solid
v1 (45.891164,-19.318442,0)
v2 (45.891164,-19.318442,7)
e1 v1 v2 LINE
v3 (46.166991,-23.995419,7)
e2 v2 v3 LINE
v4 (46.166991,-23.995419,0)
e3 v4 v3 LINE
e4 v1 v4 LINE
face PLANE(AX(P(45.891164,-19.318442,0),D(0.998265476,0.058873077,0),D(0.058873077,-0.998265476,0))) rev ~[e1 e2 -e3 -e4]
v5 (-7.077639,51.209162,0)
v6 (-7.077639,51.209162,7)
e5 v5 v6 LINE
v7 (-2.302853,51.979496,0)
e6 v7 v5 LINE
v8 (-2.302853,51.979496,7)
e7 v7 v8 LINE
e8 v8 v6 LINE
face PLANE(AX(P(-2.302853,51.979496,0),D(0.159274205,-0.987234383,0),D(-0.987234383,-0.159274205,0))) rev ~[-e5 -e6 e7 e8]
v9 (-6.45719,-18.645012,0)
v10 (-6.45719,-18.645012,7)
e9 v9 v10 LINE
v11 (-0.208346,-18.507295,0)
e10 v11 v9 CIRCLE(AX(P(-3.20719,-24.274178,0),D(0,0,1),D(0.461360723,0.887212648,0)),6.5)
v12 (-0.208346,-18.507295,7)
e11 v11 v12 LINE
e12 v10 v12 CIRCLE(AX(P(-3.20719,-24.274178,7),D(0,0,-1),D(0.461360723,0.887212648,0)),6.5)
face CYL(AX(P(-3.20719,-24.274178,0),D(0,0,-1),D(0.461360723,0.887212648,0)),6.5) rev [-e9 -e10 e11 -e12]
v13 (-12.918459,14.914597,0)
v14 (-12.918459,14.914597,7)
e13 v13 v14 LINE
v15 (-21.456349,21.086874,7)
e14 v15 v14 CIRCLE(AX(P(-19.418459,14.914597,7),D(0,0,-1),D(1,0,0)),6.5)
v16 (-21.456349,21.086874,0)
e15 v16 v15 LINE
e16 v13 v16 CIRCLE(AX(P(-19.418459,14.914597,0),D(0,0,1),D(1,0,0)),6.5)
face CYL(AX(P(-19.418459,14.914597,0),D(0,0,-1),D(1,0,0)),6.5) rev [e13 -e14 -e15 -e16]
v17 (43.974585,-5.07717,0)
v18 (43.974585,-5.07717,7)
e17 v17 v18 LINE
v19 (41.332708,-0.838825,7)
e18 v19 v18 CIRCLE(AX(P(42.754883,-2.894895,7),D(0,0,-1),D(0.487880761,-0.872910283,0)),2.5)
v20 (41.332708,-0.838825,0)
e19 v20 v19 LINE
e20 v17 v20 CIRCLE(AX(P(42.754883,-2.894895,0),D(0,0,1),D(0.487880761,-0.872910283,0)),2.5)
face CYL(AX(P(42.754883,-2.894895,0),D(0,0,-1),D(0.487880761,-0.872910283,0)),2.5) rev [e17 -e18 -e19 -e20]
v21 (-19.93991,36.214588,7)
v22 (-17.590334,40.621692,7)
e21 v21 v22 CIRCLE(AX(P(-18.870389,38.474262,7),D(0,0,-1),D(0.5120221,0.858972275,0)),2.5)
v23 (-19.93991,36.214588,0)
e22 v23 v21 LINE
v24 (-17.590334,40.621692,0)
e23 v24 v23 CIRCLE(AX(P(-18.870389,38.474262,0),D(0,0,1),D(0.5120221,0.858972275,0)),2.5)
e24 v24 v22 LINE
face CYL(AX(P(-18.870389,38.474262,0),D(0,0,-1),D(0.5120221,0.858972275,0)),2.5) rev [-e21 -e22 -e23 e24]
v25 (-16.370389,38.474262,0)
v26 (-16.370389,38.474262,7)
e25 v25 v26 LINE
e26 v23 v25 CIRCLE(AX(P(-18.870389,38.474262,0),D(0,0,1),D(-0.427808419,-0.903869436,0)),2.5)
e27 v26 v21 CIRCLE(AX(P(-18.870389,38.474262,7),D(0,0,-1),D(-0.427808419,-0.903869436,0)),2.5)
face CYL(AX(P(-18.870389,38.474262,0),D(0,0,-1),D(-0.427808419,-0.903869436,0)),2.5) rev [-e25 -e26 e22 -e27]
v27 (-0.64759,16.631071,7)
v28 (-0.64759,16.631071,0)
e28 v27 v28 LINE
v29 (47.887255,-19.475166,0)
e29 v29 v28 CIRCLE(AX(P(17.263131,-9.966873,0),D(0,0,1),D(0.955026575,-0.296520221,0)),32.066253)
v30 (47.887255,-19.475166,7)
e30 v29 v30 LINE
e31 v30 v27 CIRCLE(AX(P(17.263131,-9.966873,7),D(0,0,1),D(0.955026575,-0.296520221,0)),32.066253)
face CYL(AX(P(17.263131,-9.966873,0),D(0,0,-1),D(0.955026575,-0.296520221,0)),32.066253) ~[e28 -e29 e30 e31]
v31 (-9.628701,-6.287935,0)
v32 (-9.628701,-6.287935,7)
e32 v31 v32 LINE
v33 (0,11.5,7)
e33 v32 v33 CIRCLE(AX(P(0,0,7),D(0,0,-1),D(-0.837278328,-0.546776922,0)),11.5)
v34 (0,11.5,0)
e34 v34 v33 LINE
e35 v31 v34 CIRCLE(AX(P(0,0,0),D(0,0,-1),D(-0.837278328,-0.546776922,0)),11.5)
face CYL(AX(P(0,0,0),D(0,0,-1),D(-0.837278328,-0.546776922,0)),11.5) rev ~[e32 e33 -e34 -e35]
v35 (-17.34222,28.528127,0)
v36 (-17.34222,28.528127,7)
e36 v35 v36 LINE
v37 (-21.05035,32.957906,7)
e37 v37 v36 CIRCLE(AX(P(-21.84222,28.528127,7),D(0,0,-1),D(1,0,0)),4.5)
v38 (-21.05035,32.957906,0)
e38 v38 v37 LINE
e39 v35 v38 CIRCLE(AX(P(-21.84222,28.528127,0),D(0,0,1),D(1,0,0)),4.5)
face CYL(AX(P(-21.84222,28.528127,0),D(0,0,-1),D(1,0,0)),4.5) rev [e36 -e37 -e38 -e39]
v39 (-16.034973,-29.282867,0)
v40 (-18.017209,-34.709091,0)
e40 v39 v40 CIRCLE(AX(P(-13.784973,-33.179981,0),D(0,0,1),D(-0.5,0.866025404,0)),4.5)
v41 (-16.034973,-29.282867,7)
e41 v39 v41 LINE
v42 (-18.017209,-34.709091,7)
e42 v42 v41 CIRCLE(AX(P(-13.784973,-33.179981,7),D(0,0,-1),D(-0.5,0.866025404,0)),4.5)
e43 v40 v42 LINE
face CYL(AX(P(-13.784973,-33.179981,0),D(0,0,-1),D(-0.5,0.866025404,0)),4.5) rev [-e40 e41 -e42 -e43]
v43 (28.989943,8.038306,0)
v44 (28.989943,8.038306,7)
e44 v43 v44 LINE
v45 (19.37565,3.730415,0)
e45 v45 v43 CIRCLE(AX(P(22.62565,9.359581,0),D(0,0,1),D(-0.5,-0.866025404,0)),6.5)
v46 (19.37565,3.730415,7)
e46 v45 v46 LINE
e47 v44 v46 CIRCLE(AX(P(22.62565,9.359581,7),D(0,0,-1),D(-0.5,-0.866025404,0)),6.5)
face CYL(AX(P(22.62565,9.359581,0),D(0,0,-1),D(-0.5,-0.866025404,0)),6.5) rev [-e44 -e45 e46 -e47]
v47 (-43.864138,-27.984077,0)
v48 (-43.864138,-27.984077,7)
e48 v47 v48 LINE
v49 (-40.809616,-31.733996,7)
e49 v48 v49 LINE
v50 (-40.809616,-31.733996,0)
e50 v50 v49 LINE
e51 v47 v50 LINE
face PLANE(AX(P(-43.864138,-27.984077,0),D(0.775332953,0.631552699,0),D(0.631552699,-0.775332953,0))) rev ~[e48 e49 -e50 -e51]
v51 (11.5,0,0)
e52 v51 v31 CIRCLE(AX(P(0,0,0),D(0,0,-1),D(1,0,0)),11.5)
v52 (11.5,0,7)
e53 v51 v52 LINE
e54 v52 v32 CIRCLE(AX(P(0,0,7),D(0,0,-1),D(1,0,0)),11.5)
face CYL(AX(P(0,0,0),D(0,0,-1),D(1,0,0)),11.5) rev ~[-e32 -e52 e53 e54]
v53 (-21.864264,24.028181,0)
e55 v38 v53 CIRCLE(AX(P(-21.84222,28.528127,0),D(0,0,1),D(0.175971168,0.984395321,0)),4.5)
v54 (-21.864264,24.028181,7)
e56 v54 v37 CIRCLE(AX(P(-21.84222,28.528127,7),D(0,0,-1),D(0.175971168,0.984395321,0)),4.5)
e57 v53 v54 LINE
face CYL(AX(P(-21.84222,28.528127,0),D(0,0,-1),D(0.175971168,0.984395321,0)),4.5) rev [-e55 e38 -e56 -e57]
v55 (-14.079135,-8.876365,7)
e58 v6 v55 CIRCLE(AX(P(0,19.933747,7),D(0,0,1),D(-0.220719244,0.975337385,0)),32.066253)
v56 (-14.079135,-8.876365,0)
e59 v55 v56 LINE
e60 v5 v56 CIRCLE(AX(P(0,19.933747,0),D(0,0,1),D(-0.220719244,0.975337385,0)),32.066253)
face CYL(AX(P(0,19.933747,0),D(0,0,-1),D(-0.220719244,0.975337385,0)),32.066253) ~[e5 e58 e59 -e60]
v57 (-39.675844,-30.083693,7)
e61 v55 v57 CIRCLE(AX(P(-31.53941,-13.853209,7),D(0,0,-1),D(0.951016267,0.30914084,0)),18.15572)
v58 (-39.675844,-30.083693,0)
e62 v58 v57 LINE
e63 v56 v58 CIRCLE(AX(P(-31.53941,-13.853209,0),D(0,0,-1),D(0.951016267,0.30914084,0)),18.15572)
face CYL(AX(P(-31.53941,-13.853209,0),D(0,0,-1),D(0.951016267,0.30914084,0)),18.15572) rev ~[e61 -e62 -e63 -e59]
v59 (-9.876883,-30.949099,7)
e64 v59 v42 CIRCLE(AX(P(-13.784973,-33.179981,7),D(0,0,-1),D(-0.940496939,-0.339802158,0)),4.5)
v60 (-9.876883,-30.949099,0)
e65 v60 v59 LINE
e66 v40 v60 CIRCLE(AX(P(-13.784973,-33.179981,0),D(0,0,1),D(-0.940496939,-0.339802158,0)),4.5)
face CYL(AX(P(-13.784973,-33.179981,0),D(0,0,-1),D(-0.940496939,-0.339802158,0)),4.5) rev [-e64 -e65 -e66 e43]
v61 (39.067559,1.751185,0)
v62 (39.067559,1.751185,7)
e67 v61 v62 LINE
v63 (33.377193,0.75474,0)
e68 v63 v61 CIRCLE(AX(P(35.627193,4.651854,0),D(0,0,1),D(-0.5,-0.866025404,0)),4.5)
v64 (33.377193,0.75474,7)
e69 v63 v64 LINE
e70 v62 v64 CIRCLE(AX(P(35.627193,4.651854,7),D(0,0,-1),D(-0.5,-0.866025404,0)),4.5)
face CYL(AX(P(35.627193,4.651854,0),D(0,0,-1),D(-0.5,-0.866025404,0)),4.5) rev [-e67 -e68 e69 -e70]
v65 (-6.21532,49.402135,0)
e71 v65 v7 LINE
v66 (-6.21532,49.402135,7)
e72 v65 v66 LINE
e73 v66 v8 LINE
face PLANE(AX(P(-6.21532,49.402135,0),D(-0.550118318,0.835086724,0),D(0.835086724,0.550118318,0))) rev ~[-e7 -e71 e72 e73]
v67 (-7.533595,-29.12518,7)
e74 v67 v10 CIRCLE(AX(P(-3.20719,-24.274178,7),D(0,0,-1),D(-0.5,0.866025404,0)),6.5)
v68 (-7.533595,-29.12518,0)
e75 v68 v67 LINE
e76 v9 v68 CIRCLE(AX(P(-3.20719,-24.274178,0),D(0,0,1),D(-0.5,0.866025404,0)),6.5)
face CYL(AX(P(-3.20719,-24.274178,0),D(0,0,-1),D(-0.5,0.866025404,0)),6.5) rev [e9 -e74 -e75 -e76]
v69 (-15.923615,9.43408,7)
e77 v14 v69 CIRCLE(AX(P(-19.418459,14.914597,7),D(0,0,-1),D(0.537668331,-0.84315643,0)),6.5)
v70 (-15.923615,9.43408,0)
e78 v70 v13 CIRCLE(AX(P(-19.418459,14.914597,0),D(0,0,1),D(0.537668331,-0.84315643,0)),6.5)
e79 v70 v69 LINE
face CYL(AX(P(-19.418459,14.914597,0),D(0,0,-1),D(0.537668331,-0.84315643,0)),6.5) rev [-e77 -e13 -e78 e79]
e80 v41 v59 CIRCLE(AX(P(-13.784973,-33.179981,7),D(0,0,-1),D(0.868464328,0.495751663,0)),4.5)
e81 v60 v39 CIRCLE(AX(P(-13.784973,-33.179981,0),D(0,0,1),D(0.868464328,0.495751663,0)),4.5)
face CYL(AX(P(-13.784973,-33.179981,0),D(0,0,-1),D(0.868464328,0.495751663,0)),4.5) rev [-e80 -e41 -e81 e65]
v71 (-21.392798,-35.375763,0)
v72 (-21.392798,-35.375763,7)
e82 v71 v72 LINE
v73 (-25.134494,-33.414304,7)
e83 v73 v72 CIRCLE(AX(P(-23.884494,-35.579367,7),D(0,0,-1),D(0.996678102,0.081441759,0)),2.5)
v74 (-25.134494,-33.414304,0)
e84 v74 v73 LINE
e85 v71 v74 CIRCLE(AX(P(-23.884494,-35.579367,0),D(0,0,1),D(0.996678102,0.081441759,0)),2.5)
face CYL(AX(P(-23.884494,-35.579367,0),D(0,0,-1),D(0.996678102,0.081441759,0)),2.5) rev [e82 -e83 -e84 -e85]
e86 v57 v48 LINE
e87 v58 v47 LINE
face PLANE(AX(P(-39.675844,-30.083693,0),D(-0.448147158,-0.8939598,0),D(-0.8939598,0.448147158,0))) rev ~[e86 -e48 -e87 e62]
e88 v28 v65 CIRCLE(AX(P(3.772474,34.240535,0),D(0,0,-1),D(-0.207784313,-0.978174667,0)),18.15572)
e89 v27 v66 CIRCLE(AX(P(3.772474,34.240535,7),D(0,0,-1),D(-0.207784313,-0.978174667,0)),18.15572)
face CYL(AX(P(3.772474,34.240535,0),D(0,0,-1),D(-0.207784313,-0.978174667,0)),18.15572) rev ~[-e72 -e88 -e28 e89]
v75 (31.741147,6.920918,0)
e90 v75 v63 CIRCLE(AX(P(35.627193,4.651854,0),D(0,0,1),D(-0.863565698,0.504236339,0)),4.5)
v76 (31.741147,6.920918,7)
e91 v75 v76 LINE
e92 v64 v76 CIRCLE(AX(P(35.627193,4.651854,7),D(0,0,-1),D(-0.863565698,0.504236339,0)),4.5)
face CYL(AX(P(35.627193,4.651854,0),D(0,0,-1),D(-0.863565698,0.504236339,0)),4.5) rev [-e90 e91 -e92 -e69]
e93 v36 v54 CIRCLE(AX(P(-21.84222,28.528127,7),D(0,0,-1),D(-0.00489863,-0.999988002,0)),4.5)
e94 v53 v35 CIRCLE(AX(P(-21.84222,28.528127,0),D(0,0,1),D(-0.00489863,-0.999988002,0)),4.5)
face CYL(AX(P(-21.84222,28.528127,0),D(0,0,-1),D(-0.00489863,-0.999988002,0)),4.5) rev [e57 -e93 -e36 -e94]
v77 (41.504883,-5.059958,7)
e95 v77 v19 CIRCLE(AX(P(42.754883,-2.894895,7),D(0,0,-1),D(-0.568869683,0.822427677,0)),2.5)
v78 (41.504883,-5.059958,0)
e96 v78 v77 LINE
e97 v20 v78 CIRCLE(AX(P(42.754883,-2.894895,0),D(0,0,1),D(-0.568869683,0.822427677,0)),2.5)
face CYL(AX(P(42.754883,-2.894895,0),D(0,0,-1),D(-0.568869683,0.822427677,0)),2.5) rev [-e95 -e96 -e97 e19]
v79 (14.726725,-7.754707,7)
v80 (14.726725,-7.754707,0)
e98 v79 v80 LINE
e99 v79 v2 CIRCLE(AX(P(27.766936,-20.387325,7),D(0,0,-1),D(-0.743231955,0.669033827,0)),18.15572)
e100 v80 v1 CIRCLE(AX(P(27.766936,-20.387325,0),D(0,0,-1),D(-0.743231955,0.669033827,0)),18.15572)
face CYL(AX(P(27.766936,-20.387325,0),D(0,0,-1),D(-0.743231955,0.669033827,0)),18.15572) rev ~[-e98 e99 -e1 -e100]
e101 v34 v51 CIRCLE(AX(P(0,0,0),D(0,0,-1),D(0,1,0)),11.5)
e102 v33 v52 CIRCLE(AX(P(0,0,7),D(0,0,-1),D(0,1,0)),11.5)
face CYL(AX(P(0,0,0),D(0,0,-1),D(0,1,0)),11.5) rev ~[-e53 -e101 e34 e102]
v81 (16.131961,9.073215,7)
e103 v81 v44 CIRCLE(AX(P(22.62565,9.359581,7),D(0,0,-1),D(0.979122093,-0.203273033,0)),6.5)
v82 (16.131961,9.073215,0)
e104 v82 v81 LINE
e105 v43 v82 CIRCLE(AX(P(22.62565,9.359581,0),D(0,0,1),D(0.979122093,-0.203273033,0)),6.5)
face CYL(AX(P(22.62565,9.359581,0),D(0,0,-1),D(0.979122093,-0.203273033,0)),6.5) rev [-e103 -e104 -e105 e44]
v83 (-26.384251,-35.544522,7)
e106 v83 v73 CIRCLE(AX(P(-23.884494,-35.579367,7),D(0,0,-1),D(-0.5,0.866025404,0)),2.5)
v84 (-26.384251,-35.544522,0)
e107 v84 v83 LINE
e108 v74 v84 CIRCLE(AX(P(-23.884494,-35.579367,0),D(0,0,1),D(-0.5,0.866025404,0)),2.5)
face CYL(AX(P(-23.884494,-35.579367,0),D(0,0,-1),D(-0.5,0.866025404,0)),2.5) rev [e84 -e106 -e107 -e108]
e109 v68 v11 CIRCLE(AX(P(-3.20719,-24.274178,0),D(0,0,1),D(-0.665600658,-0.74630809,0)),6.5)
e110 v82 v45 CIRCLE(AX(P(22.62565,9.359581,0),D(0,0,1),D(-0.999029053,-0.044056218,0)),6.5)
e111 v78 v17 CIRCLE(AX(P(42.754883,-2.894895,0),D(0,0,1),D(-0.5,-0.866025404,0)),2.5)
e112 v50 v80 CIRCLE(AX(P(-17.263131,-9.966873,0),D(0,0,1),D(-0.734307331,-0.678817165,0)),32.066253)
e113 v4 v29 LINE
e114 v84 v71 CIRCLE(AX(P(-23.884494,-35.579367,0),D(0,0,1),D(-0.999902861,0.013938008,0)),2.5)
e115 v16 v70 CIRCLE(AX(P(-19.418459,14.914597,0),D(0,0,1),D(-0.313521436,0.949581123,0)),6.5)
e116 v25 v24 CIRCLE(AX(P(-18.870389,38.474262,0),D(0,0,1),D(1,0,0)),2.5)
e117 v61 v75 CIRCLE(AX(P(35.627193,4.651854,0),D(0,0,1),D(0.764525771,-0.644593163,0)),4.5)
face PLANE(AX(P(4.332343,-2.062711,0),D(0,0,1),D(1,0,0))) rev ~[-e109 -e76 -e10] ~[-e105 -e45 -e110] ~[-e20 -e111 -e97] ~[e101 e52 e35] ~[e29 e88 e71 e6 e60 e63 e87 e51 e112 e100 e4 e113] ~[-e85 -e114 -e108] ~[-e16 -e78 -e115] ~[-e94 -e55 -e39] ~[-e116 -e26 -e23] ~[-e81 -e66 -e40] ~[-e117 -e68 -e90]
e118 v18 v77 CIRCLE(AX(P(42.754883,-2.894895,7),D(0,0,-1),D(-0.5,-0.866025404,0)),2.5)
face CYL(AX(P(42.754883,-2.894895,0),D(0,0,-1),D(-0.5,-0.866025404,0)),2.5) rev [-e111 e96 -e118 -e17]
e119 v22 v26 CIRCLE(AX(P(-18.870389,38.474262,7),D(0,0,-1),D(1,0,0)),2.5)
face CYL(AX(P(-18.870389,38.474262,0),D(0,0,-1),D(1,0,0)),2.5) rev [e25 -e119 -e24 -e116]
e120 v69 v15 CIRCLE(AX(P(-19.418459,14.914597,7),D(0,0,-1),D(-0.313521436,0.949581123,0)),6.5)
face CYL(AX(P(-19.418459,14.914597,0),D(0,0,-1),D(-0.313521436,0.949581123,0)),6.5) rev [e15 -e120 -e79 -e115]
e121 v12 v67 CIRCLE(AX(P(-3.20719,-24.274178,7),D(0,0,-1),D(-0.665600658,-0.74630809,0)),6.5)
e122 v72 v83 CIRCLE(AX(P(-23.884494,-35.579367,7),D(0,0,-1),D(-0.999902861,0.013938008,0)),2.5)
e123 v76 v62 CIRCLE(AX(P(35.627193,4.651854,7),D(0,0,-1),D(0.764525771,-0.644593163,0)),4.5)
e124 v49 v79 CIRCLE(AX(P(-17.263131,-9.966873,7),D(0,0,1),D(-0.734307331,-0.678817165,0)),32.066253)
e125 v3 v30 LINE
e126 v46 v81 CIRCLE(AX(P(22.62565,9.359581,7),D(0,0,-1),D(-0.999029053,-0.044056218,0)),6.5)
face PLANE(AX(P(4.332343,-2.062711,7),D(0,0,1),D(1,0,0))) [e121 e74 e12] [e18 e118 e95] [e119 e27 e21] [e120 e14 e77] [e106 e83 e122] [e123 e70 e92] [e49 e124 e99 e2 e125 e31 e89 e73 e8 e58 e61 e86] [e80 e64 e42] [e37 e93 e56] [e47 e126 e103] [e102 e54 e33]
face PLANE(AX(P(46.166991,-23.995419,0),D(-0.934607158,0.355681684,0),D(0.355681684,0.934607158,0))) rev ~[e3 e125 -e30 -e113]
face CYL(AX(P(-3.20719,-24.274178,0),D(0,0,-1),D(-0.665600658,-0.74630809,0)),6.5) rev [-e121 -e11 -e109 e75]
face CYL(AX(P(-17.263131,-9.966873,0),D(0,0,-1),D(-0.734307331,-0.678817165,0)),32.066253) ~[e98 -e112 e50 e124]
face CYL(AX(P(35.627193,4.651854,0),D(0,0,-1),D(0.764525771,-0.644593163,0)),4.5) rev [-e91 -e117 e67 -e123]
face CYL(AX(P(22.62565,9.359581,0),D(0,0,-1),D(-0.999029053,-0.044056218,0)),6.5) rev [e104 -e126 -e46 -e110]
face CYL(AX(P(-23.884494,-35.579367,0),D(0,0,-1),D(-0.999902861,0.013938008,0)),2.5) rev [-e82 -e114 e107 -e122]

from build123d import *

# Parameters (mm, degrees)
F1_DEPTH = 7
F4_DEPTH = 25
F5_DEPTH = 25
F6_DEPTH = 25
F7_COUNT = 3
F8_DEPTH = 7


# Not quite as in the source:
# - a feature names something its author has since deleted; it is built from what else it names


with BuildPart() as f1:
    # F0 (on Top) → F1 (new body)
    with BuildSketch(Plane.XY):
        with BuildLine():
            ThreePointArc((-13.7992422924, -9.0114684358), (-14.4938657477, 7.8456043045), (0, 16.4810694803))
            ThreePointArc((0, 16.4810694803), (-14.068080809, 30.8723339162), (-6.2153203117, 49.4021353799))
            Line((-6.2153203117, 49.4021353799), (-2.3028528943, 51.9794964298))
            Line((-2.3028528943, 51.9794964298), (-7.0776391154, 51.2091623618))
            ThreePointArc((-7.0776391154, 51.2091623618), (-31.8683563703, 23.4907745685), (-13.7992422924, -9.0114684358))
        make_face()
    extrude(amount=F1_DEPTH)

    # F2 (on Top) → F4 (cut)
    with BuildSketch(Plane.XY):
        with BuildLine():
            ThreePointArc((-19.9399101365, 36.2145881717), (-17.5331910144, 36.3619404524), (-16.370389089, 38.4742617607))
            ThreePointArc((-16.370389089, 38.4742617607), (-16.6966666914, 39.7091427016), (-17.5903338395, 40.6216924484))
            ThreePointArc((-17.5903338395, 40.6216924484), (-18.870389089, 38.4742617607), (-19.9399101365, 36.2145881717))
        make_face()
        with BuildLine():
            ThreePointArc((-12.9184592818, 14.9145969957), (-15.6103285505, 20.1822473574), (-21.4563486152, 21.0868742954))
            ThreePointArc((-21.4563486152, 21.0868742954), (-19.4184592818, 14.9145969957), (-15.9236151324, 9.4340801978))
            ThreePointArc((-15.9236151324, 9.4340801978), (-13.7190519893, 11.7894159586), (-12.9184592818, 14.9145969957))
        make_face()
        with BuildLine():
            ThreePointArc((-15.9236151324, 9.4340801978), (-19.4184592818, 14.9145969957), (-21.4563486152, 21.0868742954))
            ThreePointArc((-21.4563486152, 21.0868742954), (-25.2902206788, 12.1266913129), (-15.9236151324, 9.4340801978))
        make_face()
        with BuildLine():
            ThreePointArc((-17.3422204011, 28.5281271909), (-18.3916105886, 31.4166028999), (-21.0503501441, 32.9579061352))
            ThreePointArc((-21.0503501441, 32.9579061352), (-21.8422204011, 28.5281271909), (-21.8642642373, 24.0281811835))
            ThreePointArc((-21.8642642373, 24.0281811835), (-18.6680431268, 25.3383625238), (-17.3422204011, 28.5281271909))
        make_face()
        with BuildLine():
            ThreePointArc((-21.8642642373, 24.0281811835), (-21.8422204011, 28.5281271909), (-21.0503501441, 32.9579061352))
            ThreePointArc((-21.0503501441, 32.9579061352), (-26.3236437362, 28.9365937035), (-21.8642642373, 24.0281811835))
        make_face()
        with BuildLine():
            ThreePointArc((-19.9399101365, 36.2145881717), (-18.870389089, 38.4742617607), (-17.5903338395, 40.6216924484))
            ThreePointArc((-17.5903338395, 40.6216924484), (-21.0764541807, 39.6503896496), (-19.9399101365, 36.2145881717))
        make_face()
    extrude(amount=-F4_DEPTH, mode=Mode.SUBTRACT)

    # F2 (on Top) → F5 (cut)
    with BuildSketch(Plane.XY):
        with BuildLine():
            ThreePointArc((-19.9399101365, 36.2145881717), (-17.5331910144, 36.3619404524), (-16.370389089, 38.4742617607))
            ThreePointArc((-16.370389089, 38.4742617607), (-16.6966666914, 39.7091427016), (-17.5903338395, 40.6216924484))
            ThreePointArc((-17.5903338395, 40.6216924484), (-18.870389089, 38.4742617607), (-19.9399101365, 36.2145881717))
        make_face()
        with BuildLine():
            ThreePointArc((-12.9184592818, 14.9145969957), (-15.6103285505, 20.1822473574), (-21.4563486152, 21.0868742954))
            ThreePointArc((-21.4563486152, 21.0868742954), (-19.4184592818, 14.9145969957), (-15.9236151324, 9.4340801978))
            ThreePointArc((-15.9236151324, 9.4340801978), (-13.7190519893, 11.7894159586), (-12.9184592818, 14.9145969957))
        make_face()
        with BuildLine():
            ThreePointArc((-15.9236151324, 9.4340801978), (-19.4184592818, 14.9145969957), (-21.4563486152, 21.0868742954))
            ThreePointArc((-21.4563486152, 21.0868742954), (-25.2902206788, 12.1266913129), (-15.9236151324, 9.4340801978))
        make_face()
        with BuildLine():
            ThreePointArc((-17.3422204011, 28.5281271909), (-18.3916105886, 31.4166028999), (-21.0503501441, 32.9579061352))
            ThreePointArc((-21.0503501441, 32.9579061352), (-21.8422204011, 28.5281271909), (-21.8642642373, 24.0281811835))
            ThreePointArc((-21.8642642373, 24.0281811835), (-18.6680431268, 25.3383625238), (-17.3422204011, 28.5281271909))
        make_face()
        with BuildLine():
            ThreePointArc((-21.8642642373, 24.0281811835), (-21.8422204011, 28.5281271909), (-21.0503501441, 32.9579061352))
            ThreePointArc((-21.0503501441, 32.9579061352), (-26.3236437362, 28.9365937035), (-21.8642642373, 24.0281811835))
        make_face()
        with BuildLine():
            ThreePointArc((-19.9399101365, 36.2145881717), (-18.870389089, 38.4742617607), (-17.5903338395, 40.6216924484))
            ThreePointArc((-17.5903338395, 40.6216924484), (-21.0764541807, 39.6503896496), (-19.9399101365, 36.2145881717))
        make_face()
    extrude(amount=-F5_DEPTH, mode=Mode.SUBTRACT)

    # F2 (on Top) → F6 (cut)
    with BuildSketch(Plane.XY):
        with BuildLine():
            ThreePointArc((-19.9399101365, 36.2145881717), (-17.5331910144, 36.3619404524), (-16.370389089, 38.4742617607))
            ThreePointArc((-16.370389089, 38.4742617607), (-16.6966666914, 39.7091427016), (-17.5903338395, 40.6216924484))
            ThreePointArc((-17.5903338395, 40.6216924484), (-18.870389089, 38.4742617607), (-19.9399101365, 36.2145881717))
        make_face()
        with BuildLine():
            ThreePointArc((-12.9184592818, 14.9145969957), (-15.6103285505, 20.1822473574), (-21.4563486152, 21.0868742954))
            ThreePointArc((-21.4563486152, 21.0868742954), (-19.4184592818, 14.9145969957), (-15.9236151324, 9.4340801978))
            ThreePointArc((-15.9236151324, 9.4340801978), (-13.7190519893, 11.7894159586), (-12.9184592818, 14.9145969957))
        make_face()
        with BuildLine():
            ThreePointArc((-15.9236151324, 9.4340801978), (-19.4184592818, 14.9145969957), (-21.4563486152, 21.0868742954))
            ThreePointArc((-21.4563486152, 21.0868742954), (-25.2902206788, 12.1266913129), (-15.9236151324, 9.4340801978))
        make_face()
        with BuildLine():
            ThreePointArc((-17.3422204011, 28.5281271909), (-18.3916105886, 31.4166028999), (-21.0503501441, 32.9579061352))
            ThreePointArc((-21.0503501441, 32.9579061352), (-21.8422204011, 28.5281271909), (-21.8642642373, 24.0281811835))
            ThreePointArc((-21.8642642373, 24.0281811835), (-18.6680431268, 25.3383625238), (-17.3422204011, 28.5281271909))
        make_face()
        with BuildLine():
            ThreePointArc((-21.8642642373, 24.0281811835), (-21.8422204011, 28.5281271909), (-21.0503501441, 32.9579061352))
            ThreePointArc((-21.0503501441, 32.9579061352), (-26.3236437362, 28.9365937035), (-21.8642642373, 24.0281811835))
        make_face()
        with BuildLine():
            ThreePointArc((-19.9399101365, 36.2145881717), (-18.870389089, 38.4742617607), (-17.5903338395, 40.6216924484))
            ThreePointArc((-17.5903338395, 40.6216924484), (-21.0764541807, 39.6503896496), (-19.9399101365, 36.2145881717))
        make_face()
    extrude(amount=F6_DEPTH, mode=Mode.SUBTRACT)


with BuildPart() as f7_1:
    # F7: instance of F1
    add(f1.part.rotate(Axis((0, 0, -1.6987677664), (0, 0, -1)), 1 * 360 / F7_COUNT))


with BuildPart() as f7_2:
    # F7: instance of F1
    add(f1.part.rotate(Axis((0, 0, -1.6987677664), (0, 0, -1)), 2 * 360 / F7_COUNT))


with BuildPart() as f1_1:
    add(f1.part)

    add(f7_1.part)  # F8 merges F7_1

    add(f7_2.part)  # F8 merges F7_2
    # F0 (on Top) → F8 (join)
    with BuildSketch(Plane.XY):
        with BuildLine():
            Line((0, 16.4810694803), (0, 11.5))
            ThreePointArc((0, 11.5), (8.1317279836, 8.1317279836), (11.5, 0))
            ThreePointArc((11.5, 0), (3.2802394095, -11.0222515584), (-9.628700768, -6.2879345989))
            Line((-9.628700768, -6.2879345989), (-13.7992422924, -9.0114684358))
            ThreePointArc((-13.7992422924, -9.0114684358), (4.7010307496, -15.796390762), (16.4810694803, 0))
            ThreePointArc((16.4810694803, 0), (11.6538759907, 11.6538759907), (0, 16.4810694803))
        make_face()
        with BuildLine():
            ThreePointArc((-9.628700768, -6.2879345989), (-10.1133883513, 5.4744292905), (0, 11.5))
            Line((0, 11.5), (0, 16.4810694803))
            ThreePointArc((0, 16.4810694803), (-14.4938657477, 7.8456043045), (-13.7992422924, -9.0114684358))
            Line((-13.7992422924, -9.0114684358), (-9.628700768, -6.2879345989))
        make_face()
    extrude(amount=F8_DEPTH)


solid = f1_1.part
